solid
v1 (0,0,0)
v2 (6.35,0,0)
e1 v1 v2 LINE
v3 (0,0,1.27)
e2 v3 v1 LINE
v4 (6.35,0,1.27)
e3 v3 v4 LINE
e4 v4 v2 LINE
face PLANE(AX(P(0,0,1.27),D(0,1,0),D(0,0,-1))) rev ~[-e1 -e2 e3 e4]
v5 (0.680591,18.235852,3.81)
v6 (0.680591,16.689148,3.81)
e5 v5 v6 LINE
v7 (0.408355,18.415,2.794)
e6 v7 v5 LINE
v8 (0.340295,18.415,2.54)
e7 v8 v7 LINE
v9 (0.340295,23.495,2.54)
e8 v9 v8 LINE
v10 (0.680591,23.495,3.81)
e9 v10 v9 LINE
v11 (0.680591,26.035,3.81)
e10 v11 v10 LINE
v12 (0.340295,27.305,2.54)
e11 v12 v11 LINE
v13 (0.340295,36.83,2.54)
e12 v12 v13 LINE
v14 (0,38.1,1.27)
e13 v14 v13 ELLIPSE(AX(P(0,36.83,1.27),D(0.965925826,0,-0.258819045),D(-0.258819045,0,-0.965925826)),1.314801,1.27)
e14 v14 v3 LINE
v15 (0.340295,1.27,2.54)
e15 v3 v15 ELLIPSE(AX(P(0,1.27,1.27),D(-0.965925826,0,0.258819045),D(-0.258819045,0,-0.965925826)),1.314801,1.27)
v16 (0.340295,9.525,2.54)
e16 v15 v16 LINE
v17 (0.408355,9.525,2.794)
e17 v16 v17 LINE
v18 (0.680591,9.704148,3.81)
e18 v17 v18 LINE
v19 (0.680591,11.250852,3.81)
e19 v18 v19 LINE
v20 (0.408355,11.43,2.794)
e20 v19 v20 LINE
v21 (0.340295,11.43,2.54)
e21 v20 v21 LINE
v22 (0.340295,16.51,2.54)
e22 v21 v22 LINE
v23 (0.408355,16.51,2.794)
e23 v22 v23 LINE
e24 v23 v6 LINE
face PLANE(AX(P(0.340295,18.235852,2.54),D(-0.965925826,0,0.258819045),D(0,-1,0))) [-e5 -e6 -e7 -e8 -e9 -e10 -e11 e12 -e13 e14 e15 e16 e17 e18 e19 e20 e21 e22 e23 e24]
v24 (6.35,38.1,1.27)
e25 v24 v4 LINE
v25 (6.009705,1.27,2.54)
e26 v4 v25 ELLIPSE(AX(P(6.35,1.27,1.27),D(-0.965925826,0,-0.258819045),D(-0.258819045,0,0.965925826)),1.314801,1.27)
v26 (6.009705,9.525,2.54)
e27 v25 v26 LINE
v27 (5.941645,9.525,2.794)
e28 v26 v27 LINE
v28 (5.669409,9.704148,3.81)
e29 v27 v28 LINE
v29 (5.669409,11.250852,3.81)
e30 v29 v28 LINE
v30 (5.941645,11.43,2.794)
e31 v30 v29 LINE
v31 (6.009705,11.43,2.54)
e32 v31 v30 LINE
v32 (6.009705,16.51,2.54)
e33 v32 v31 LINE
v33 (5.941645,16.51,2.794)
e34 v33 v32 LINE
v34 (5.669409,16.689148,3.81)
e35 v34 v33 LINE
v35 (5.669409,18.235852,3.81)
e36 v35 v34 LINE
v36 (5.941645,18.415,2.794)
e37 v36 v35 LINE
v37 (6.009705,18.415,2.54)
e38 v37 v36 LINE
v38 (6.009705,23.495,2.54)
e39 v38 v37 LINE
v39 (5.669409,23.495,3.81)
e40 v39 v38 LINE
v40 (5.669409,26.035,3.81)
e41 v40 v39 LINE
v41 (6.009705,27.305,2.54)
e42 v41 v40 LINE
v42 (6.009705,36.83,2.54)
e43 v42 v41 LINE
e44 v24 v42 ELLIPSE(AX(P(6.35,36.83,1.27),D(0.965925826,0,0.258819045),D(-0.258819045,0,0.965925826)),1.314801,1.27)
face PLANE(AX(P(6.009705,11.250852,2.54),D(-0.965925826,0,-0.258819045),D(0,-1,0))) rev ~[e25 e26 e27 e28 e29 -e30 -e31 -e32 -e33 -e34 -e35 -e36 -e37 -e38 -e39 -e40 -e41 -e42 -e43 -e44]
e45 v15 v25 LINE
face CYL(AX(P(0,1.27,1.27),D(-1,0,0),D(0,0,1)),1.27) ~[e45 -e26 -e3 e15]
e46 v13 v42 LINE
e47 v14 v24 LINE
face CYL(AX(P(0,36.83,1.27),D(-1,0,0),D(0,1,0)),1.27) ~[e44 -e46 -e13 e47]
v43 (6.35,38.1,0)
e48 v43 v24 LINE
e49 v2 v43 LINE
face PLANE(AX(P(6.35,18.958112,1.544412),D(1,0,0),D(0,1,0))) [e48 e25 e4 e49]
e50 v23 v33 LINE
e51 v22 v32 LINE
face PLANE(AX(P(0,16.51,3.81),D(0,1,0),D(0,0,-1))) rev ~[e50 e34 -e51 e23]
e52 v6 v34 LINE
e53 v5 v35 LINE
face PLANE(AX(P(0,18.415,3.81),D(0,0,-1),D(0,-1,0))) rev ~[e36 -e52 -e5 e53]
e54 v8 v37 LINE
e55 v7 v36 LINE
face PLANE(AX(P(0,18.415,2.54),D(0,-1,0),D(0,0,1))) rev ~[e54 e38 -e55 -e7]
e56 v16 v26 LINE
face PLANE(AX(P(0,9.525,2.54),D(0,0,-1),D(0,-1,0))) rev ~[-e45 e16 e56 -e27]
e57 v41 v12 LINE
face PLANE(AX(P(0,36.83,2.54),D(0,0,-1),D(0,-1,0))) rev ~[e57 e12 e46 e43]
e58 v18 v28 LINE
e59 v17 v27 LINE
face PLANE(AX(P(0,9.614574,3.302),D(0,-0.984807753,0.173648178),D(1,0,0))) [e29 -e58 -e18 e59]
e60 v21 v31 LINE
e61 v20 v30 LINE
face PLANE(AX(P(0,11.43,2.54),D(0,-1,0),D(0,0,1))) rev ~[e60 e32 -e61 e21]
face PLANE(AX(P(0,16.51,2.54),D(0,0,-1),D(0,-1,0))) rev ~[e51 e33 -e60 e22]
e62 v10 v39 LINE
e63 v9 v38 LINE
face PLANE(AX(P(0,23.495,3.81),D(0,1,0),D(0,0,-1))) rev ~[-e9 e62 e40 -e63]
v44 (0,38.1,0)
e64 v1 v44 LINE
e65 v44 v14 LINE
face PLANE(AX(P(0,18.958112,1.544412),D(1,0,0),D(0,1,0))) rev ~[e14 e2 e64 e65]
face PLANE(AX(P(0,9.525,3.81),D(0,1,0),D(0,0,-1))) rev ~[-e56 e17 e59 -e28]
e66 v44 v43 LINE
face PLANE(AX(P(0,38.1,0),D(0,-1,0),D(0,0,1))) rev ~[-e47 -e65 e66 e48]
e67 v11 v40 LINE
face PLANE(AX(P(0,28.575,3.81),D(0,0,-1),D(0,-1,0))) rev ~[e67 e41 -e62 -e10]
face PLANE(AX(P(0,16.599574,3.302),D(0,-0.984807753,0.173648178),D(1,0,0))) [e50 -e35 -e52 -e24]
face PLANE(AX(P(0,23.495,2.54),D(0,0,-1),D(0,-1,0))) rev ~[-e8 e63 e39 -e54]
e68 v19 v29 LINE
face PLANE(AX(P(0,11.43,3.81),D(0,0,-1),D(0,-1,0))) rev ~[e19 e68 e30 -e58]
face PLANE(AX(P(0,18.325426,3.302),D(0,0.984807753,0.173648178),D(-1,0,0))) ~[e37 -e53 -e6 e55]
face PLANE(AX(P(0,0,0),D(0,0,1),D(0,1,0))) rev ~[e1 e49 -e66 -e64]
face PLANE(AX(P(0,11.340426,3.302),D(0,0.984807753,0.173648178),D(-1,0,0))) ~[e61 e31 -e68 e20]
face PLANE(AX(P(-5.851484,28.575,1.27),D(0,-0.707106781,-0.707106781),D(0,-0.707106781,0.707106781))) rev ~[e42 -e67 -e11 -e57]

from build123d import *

# Parameters (mm, degrees)
F1_DEPTH    = 6.35
F2_SIZE2    = 0.1791482124
F2_SIZE     = 1.016
F2_2_SIZE2  = 0.1791482124
F2_2_SIZE   = 1.016
F2_3_SIZE2  = 0.1791482124
F2_3_SIZE   = 1.016
F3_SIZE2    = 0.1791482124
F3_SIZE     = 1.016
F4_SIZE2    = 0.6805909488
F4_SIZE     = 2.54
F5_SIZE2    = 0.6805909488
F5_SIZE     = 2.54
F6_T4_DEPTH = 18.0529676813


# Not quite as in the source:
# - a fillet or chamfer that OpenCascade refuses, or shapes differently, is made with other operations: its cross-section is extruded or revolved along the edge and cut away or added


with BuildPart() as f1:
    # F0 (on Right) → F1 (new body)
    with BuildSketch(Plane.YZ):
        with BuildLine():
            Line((0, 1.27), (0, 0))
            Line((0, 0), (38.1, 0))
            Line((38.1, 0), (38.1, 1.27))
            ThreePointArc((38.1, 1.27), (37.7280256121, 2.1680256121), (36.83, 2.54))
            Line((36.83, 2.54), (28.575, 2.54))
            Line((28.575, 2.54), (28.575, 3.81))
            Line((28.575, 3.81), (23.495, 3.81))
            Line((23.495, 3.81), (23.495, 2.54))
            Line((23.495, 2.54), (18.415, 2.54))
            Line((18.415, 2.54), (18.415, 3.81))
            Line((18.415, 3.81), (16.51, 3.81))
            Line((16.51, 3.81), (16.51, 2.54))
            Line((16.51, 2.54), (11.43, 2.54))
            Line((11.43, 2.54), (11.43, 3.81))
            Line((11.43, 3.81), (9.525, 3.81))
            Line((9.525, 3.81), (9.525, 2.54))
            Line((9.525, 2.54), (1.27, 2.54))
            ThreePointArc((1.27, 2.54), (0.3719743879, 2.1680256121), (0, 1.27))
        make_face()
    extrude(amount=F1_DEPTH)

    # F2
    f2_edges = [f1.edges().sort_by_distance(p)[0] for p in [
        (3.175, 11.43, 3.81),
    ]]
    f2_side = f1.faces().sort_by_distance((3.175, 11.43, 3.175))[0]
    chamfer(f2_edges, length=F2_SIZE, length2=F2_SIZE2, reference=f2_side)

    # F2#2
    f2_2_edges = [f1.edges().sort_by_distance(p)[0] for p in [
        (3.175, 9.525, 3.81),
    ]]
    f2_2_side = f1.faces().sort_by_distance((3.175, 9.525, 3.175))[0]
    chamfer(f2_2_edges, length=F2_2_SIZE, length2=F2_2_SIZE2, reference=f2_2_side)

    # F2#3
    f2_3_edges = [f1.edges().sort_by_distance(p)[0] for p in [
        (3.175, 18.415, 3.81),
    ]]
    f2_3_side = f1.faces().sort_by_distance((3.175, 18.415, 3.175))[0]
    chamfer(f2_3_edges, length=F2_3_SIZE, length2=F2_3_SIZE2, reference=f2_3_side)

    # F3
    f3_edges = [f1.edges().sort_by_distance(p)[0] for p in [
        (3.175, 16.51, 3.81),
    ]]
    f3_side = f1.faces().sort_by_distance((3.175, 16.51, 3.175))[0]
    chamfer(f3_edges, length=F3_SIZE, length2=F3_SIZE2, reference=f3_side)

    # F4
    f4_edges = [f1.edges().sort_by_distance(p)[0] for p in [
        (6.35, 10.4775, 3.81),
    ]]
    f4_side = f1.faces().sort_by_distance((6.35, 19.258705, 1.457125))[0]
    chamfer(f4_edges, length=F4_SIZE, length2=F4_SIZE2, reference=f4_side)

    # F5
    f5_edges = [f1.edges().sort_by_distance(p)[0] for p in [
        (0, 17.4625, 3.81),
    ]]
    f5_side = f1.faces().sort_by_distance((0, 19.258705, 1.457125))[0]
    chamfer(f5_edges, length=F5_SIZE, length2=F5_SIZE2, reference=f5_side)

    # F6: chamfer of 2.54 on 1 edges, made by hand


with BuildPart() as f6_tool2:
    # F6_s3 → F6_t4 (new body)
    with BuildSketch(Plane.YZ.offset(-5.8514838407)):
        Polygon((28.575, 1.27), (26.035, 3.81), (28.575, 3.81), align=None)
    extrude(amount=F6_T4_DEPTH)

    split(bisect_by=Plane.XY.offset(2.54), keep=Keep.TOP)


with BuildPart() as f1_1:
    add(f1.part)

    # F6_t1: cut F6_tool2
    add(f6_tool2.part, mode=Mode.SUBTRACT)


solid = f1_1.part
